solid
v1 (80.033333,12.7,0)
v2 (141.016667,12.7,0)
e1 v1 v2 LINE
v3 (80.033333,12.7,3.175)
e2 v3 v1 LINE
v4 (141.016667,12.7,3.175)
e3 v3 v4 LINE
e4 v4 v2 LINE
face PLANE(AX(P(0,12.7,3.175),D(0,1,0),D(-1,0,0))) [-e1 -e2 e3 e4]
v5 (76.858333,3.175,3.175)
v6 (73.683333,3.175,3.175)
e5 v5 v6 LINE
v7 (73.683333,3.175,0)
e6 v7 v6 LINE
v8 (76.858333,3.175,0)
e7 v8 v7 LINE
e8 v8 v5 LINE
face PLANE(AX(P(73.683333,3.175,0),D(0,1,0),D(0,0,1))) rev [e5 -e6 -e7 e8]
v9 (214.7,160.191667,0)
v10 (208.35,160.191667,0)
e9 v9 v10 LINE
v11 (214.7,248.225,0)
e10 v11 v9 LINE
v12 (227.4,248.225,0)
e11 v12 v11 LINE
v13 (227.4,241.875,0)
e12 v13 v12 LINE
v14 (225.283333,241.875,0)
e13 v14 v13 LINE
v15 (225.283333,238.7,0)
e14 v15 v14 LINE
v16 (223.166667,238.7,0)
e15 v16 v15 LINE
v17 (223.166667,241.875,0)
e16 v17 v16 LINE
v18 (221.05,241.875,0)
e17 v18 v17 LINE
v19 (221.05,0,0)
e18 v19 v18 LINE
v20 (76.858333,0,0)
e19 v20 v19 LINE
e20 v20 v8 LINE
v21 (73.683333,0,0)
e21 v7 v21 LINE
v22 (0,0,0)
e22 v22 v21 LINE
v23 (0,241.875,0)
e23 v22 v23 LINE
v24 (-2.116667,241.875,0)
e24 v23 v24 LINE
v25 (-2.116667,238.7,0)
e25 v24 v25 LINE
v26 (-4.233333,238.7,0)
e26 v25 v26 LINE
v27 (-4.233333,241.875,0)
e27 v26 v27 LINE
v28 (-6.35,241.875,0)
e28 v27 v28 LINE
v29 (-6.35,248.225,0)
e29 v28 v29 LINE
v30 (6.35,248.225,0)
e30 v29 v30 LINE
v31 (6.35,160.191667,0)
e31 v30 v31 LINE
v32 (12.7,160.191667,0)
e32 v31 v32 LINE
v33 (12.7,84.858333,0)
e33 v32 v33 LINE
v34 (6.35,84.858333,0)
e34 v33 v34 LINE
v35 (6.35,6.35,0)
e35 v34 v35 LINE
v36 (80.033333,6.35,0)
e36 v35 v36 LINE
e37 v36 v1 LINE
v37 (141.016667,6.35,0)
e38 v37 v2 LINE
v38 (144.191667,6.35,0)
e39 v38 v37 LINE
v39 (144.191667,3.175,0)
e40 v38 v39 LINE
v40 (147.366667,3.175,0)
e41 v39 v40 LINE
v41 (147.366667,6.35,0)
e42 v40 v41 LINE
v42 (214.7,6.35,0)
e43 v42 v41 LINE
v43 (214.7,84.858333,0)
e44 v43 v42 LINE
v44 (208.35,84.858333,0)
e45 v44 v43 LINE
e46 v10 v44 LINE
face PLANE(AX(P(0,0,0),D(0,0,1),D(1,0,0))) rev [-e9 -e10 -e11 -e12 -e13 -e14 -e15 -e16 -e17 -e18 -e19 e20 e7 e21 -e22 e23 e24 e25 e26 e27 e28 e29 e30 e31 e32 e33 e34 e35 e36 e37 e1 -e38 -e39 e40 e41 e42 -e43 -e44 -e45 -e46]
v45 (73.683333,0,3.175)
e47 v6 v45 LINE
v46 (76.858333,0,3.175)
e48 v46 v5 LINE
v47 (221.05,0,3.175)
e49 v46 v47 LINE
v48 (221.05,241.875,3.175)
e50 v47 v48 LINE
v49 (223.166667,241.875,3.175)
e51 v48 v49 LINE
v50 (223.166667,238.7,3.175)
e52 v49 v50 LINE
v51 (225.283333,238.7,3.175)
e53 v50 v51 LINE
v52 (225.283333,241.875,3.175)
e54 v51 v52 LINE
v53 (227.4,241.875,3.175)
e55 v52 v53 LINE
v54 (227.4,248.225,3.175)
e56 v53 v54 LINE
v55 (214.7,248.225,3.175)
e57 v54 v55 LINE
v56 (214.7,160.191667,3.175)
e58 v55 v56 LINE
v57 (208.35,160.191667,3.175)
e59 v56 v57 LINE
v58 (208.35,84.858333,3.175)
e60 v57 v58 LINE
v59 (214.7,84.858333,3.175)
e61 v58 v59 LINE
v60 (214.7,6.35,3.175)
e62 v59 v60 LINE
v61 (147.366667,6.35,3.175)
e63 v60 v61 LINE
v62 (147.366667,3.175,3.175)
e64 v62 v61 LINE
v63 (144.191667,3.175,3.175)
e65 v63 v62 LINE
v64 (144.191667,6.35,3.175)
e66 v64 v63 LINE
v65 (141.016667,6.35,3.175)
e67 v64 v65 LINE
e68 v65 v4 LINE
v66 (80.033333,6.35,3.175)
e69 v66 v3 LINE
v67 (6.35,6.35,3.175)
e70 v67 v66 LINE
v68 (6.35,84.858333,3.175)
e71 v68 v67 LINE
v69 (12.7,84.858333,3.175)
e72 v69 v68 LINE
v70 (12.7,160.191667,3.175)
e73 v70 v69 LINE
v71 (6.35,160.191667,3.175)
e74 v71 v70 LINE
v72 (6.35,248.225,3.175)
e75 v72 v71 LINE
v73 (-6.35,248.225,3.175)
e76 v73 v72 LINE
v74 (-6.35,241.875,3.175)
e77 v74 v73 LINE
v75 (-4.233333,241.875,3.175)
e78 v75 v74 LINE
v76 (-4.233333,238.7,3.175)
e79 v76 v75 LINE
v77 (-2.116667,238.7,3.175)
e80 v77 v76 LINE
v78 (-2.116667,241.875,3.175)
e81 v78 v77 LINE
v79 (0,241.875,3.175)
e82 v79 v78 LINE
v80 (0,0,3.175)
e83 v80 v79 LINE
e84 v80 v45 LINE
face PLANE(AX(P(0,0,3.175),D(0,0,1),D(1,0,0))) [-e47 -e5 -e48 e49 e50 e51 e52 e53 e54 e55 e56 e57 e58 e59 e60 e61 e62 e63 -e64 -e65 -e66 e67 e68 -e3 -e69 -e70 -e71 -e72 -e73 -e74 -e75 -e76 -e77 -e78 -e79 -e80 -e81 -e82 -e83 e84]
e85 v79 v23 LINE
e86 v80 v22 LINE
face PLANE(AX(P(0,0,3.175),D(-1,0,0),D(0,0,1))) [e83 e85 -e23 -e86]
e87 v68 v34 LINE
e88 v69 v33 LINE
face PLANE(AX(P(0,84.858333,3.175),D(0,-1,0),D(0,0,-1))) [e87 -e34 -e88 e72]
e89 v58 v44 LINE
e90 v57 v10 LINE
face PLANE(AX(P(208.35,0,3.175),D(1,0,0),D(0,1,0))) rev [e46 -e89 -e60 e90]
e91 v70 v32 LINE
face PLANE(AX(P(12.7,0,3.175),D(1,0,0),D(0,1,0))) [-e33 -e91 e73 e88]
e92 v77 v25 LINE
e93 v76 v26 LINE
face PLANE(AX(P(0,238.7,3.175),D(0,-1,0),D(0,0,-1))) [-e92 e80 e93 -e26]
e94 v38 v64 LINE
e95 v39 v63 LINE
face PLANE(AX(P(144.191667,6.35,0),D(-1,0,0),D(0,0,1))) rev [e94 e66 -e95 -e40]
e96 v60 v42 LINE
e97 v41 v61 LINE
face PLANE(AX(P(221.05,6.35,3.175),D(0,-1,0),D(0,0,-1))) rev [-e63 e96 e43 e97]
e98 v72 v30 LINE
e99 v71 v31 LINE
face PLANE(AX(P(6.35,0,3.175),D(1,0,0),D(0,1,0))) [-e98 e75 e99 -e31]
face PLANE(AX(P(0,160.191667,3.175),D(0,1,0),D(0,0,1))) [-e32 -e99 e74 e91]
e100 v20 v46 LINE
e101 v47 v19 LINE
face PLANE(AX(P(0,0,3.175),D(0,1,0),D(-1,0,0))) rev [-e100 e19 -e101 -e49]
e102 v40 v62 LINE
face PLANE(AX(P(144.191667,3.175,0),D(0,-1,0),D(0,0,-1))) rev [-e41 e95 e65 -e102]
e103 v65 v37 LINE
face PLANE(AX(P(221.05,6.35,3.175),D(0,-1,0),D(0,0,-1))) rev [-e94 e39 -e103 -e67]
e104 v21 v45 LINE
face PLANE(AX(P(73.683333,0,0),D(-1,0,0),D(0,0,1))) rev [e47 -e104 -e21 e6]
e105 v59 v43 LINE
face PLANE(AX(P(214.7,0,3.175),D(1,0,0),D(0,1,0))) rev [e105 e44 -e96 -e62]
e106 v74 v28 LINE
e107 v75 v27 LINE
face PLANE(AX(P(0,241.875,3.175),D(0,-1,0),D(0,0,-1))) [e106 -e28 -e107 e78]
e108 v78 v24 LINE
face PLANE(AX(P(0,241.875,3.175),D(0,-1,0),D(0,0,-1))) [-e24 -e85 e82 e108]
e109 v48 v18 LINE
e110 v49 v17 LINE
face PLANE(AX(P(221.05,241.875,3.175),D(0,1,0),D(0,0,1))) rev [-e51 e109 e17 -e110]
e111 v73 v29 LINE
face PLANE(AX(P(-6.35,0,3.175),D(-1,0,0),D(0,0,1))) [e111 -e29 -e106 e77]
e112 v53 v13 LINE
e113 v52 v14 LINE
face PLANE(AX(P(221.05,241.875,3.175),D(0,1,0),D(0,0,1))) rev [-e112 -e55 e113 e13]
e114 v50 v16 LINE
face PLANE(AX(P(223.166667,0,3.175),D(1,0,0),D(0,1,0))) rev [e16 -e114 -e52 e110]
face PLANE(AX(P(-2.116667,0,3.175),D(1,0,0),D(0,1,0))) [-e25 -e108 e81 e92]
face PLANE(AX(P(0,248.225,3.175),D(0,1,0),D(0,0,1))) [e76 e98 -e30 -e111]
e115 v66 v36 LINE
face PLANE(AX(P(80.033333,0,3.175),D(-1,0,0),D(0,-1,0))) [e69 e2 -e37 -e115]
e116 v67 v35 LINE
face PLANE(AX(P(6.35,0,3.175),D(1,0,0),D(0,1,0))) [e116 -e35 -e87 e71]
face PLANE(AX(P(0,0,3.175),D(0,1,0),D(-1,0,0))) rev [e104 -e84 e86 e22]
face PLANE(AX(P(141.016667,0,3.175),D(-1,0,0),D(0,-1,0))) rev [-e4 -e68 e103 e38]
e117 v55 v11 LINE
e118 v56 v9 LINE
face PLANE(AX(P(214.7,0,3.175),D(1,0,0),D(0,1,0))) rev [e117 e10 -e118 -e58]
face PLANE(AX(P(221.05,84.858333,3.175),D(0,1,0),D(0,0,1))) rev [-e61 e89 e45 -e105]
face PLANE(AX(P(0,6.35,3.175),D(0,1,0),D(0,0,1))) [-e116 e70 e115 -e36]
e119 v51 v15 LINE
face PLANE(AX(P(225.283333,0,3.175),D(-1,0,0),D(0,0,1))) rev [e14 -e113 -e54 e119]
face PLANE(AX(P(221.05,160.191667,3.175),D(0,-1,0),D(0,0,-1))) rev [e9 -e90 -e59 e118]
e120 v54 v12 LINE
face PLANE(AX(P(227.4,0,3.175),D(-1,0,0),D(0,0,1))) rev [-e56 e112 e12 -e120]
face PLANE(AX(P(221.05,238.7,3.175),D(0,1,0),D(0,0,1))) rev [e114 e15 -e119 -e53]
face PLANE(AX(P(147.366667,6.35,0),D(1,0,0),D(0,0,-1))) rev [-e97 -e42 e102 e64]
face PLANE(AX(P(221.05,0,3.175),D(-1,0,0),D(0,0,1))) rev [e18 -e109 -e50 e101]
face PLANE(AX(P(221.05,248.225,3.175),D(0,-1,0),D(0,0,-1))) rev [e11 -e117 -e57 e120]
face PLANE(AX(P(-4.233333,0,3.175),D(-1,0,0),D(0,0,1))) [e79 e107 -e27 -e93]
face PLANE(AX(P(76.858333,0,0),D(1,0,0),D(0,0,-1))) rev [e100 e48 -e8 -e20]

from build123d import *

# Parameters (mm, degrees)
BOSS_EXTRUDE1_DEPTH = 3.175
MIRROR1_OUTLINE_W   = 6.35
MIRROR1_OUTLINE_H   = 3.175
MIRROR1_DEPTH       = 248.225
MIRROR1_2_OUTLINE_W = 104.175
MIRROR1_2_OUTLINE_H = 3.175
MIRROR1_2_DEPTH     = 6.35
MIRROR1_START       = 84.858333333
MIRROR1_3_OUTLINE_W = 6.35
MIRROR1_3_OUTLINE_H = 3.175
MIRROR1_3_DEPTH     = 75.333333334
MIRROR1_START_2     = 6.35
MIRROR1_4_OUTLINE_W = 30.491666667
MIRROR1_4_OUTLINE_H = 3.175
MIRROR1_4_DEPTH     = 6.35
MIRROR1_START_3     = 241.875
MIRROR1_5_OUTLINE_W = 6.35
MIRROR1_5_OUTLINE_H = 3.175
MIRROR1_5_DEPTH     = 6.35
MIRROR1_START_4     = 238.7
MIRROR1_6_OUTLINE_W = 2.116666666
MIRROR1_6_OUTLINE_H = 3.175
MIRROR1_6_DEPTH     = 3.175
SKETCH2_W           = 3.175
SKETCH2_H           = 3.175
CUT_EXTRUDE1_DEPTH  = 3.175


# Read off the part's stored shape, not the designer's step: Mirror1
with BuildPart() as part:
    # Sketch1 → Boss-Extrude1 (new body)
    with BuildSketch(Plane.XY):
        Polygon((6.35, 232.35), (0, 232.35), (0, 0), (110.525, 0), (110.525, 12.7), (80.033333333, 12.7), (80.033333333, 6.35), (6.35, 6.35), (6.35, 84.858333333), (12.7, 84.858333333), (12.7, 160.191666667), (6.35, 160.191666667), align=None)
        Polygon((-2.116666667, 241.875), (0, 241.875), (0, 232.35), (6.35, 232.35), (6.35, 248.225), (-6.35, 248.225), (-6.35, 241.875), (-4.233333333, 241.875), (-4.233333333, 238.7), (-2.116666667, 238.7), align=None)
    extrude(amount=BOSS_EXTRUDE1_DEPTH)



with BuildPart() as body_2:
    # Mirror1 outline → Mirror1 (new body)
    with BuildSketch(Plane(origin=(0, 0, 0), x_dir=(1, 0, 0), z_dir=(0, 1, 0))):
        with Locations((217.875, -1.5875)):
            Rectangle(MIRROR1_OUTLINE_W, MIRROR1_OUTLINE_H)
    extrude(amount=MIRROR1_DEPTH)


with BuildPart() as part_1:
    add(part.part)

    add(body_2.part)  # Mirror1 2 merges body 2
    # Mirror1 2 outline → Mirror1 2 (add)
    with BuildSketch(Plane(origin=(0, 0, 0), x_dir=(1, 0, 0), z_dir=(0, 1, 0))):
        with Locations((162.6125, -1.5875)):
            Rectangle(MIRROR1_2_OUTLINE_W, MIRROR1_2_OUTLINE_H)
    extrude(amount=MIRROR1_2_DEPTH)

    # Mirror1 3 outline → Mirror1 3 (add)
    with BuildSketch(Plane(origin=(0, 0, 0), x_dir=(1, 0, 0), z_dir=(0, 1, 0)).offset(MIRROR1_START)):
        with Locations((211.525, -1.5875)):
            Rectangle(MIRROR1_3_OUTLINE_W, MIRROR1_3_OUTLINE_H)
    extrude(amount=MIRROR1_3_DEPTH)

    # Mirror1 4 outline → Mirror1 4 (add)
    with BuildSketch(Plane(origin=(0, 0, 0), x_dir=(1, 0, 0), z_dir=(0, 1, 0)).offset(MIRROR1_START_2)):
        with Locations((125.770833334, -1.5875)):
            Rectangle(MIRROR1_4_OUTLINE_W, MIRROR1_4_OUTLINE_H)
    extrude(amount=MIRROR1_4_DEPTH)

    # Mirror1 5 outline → Mirror1 5 (add)
    with BuildSketch(Plane(origin=(0, 0, 0), x_dir=(1, 0, 0), z_dir=(0, 1, 0)).offset(MIRROR1_START_3)):
        with Locations((224.225, -1.5875)):
            Rectangle(MIRROR1_5_OUTLINE_W, MIRROR1_5_OUTLINE_H)
    extrude(amount=MIRROR1_5_DEPTH)

    # Mirror1 6 outline → Mirror1 6 (add)
    with BuildSketch(Plane(origin=(0, 0, 0), x_dir=(1, 0, 0), z_dir=(0, 1, 0)).offset(MIRROR1_START_4)):
        with Locations((224.225, -1.5875)):
            Rectangle(MIRROR1_6_OUTLINE_W, MIRROR1_6_OUTLINE_H)
    extrude(amount=MIRROR1_6_DEPTH)

    # Sketch2 → Cut-Extrude1 (cut)
    with BuildSketch(Plane.XY.offset(3.175)):
        with Locations((75.270833333, 1.5875)):
            Rectangle(SKETCH2_W, SKETCH2_H)
        with Locations((145.779166667, 4.7625)):
            Rectangle(SKETCH2_W, SKETCH2_H)
    extrude(amount=-CUT_EXTRUDE1_DEPTH, mode=Mode.SUBTRACT)


solid = part_1.part
